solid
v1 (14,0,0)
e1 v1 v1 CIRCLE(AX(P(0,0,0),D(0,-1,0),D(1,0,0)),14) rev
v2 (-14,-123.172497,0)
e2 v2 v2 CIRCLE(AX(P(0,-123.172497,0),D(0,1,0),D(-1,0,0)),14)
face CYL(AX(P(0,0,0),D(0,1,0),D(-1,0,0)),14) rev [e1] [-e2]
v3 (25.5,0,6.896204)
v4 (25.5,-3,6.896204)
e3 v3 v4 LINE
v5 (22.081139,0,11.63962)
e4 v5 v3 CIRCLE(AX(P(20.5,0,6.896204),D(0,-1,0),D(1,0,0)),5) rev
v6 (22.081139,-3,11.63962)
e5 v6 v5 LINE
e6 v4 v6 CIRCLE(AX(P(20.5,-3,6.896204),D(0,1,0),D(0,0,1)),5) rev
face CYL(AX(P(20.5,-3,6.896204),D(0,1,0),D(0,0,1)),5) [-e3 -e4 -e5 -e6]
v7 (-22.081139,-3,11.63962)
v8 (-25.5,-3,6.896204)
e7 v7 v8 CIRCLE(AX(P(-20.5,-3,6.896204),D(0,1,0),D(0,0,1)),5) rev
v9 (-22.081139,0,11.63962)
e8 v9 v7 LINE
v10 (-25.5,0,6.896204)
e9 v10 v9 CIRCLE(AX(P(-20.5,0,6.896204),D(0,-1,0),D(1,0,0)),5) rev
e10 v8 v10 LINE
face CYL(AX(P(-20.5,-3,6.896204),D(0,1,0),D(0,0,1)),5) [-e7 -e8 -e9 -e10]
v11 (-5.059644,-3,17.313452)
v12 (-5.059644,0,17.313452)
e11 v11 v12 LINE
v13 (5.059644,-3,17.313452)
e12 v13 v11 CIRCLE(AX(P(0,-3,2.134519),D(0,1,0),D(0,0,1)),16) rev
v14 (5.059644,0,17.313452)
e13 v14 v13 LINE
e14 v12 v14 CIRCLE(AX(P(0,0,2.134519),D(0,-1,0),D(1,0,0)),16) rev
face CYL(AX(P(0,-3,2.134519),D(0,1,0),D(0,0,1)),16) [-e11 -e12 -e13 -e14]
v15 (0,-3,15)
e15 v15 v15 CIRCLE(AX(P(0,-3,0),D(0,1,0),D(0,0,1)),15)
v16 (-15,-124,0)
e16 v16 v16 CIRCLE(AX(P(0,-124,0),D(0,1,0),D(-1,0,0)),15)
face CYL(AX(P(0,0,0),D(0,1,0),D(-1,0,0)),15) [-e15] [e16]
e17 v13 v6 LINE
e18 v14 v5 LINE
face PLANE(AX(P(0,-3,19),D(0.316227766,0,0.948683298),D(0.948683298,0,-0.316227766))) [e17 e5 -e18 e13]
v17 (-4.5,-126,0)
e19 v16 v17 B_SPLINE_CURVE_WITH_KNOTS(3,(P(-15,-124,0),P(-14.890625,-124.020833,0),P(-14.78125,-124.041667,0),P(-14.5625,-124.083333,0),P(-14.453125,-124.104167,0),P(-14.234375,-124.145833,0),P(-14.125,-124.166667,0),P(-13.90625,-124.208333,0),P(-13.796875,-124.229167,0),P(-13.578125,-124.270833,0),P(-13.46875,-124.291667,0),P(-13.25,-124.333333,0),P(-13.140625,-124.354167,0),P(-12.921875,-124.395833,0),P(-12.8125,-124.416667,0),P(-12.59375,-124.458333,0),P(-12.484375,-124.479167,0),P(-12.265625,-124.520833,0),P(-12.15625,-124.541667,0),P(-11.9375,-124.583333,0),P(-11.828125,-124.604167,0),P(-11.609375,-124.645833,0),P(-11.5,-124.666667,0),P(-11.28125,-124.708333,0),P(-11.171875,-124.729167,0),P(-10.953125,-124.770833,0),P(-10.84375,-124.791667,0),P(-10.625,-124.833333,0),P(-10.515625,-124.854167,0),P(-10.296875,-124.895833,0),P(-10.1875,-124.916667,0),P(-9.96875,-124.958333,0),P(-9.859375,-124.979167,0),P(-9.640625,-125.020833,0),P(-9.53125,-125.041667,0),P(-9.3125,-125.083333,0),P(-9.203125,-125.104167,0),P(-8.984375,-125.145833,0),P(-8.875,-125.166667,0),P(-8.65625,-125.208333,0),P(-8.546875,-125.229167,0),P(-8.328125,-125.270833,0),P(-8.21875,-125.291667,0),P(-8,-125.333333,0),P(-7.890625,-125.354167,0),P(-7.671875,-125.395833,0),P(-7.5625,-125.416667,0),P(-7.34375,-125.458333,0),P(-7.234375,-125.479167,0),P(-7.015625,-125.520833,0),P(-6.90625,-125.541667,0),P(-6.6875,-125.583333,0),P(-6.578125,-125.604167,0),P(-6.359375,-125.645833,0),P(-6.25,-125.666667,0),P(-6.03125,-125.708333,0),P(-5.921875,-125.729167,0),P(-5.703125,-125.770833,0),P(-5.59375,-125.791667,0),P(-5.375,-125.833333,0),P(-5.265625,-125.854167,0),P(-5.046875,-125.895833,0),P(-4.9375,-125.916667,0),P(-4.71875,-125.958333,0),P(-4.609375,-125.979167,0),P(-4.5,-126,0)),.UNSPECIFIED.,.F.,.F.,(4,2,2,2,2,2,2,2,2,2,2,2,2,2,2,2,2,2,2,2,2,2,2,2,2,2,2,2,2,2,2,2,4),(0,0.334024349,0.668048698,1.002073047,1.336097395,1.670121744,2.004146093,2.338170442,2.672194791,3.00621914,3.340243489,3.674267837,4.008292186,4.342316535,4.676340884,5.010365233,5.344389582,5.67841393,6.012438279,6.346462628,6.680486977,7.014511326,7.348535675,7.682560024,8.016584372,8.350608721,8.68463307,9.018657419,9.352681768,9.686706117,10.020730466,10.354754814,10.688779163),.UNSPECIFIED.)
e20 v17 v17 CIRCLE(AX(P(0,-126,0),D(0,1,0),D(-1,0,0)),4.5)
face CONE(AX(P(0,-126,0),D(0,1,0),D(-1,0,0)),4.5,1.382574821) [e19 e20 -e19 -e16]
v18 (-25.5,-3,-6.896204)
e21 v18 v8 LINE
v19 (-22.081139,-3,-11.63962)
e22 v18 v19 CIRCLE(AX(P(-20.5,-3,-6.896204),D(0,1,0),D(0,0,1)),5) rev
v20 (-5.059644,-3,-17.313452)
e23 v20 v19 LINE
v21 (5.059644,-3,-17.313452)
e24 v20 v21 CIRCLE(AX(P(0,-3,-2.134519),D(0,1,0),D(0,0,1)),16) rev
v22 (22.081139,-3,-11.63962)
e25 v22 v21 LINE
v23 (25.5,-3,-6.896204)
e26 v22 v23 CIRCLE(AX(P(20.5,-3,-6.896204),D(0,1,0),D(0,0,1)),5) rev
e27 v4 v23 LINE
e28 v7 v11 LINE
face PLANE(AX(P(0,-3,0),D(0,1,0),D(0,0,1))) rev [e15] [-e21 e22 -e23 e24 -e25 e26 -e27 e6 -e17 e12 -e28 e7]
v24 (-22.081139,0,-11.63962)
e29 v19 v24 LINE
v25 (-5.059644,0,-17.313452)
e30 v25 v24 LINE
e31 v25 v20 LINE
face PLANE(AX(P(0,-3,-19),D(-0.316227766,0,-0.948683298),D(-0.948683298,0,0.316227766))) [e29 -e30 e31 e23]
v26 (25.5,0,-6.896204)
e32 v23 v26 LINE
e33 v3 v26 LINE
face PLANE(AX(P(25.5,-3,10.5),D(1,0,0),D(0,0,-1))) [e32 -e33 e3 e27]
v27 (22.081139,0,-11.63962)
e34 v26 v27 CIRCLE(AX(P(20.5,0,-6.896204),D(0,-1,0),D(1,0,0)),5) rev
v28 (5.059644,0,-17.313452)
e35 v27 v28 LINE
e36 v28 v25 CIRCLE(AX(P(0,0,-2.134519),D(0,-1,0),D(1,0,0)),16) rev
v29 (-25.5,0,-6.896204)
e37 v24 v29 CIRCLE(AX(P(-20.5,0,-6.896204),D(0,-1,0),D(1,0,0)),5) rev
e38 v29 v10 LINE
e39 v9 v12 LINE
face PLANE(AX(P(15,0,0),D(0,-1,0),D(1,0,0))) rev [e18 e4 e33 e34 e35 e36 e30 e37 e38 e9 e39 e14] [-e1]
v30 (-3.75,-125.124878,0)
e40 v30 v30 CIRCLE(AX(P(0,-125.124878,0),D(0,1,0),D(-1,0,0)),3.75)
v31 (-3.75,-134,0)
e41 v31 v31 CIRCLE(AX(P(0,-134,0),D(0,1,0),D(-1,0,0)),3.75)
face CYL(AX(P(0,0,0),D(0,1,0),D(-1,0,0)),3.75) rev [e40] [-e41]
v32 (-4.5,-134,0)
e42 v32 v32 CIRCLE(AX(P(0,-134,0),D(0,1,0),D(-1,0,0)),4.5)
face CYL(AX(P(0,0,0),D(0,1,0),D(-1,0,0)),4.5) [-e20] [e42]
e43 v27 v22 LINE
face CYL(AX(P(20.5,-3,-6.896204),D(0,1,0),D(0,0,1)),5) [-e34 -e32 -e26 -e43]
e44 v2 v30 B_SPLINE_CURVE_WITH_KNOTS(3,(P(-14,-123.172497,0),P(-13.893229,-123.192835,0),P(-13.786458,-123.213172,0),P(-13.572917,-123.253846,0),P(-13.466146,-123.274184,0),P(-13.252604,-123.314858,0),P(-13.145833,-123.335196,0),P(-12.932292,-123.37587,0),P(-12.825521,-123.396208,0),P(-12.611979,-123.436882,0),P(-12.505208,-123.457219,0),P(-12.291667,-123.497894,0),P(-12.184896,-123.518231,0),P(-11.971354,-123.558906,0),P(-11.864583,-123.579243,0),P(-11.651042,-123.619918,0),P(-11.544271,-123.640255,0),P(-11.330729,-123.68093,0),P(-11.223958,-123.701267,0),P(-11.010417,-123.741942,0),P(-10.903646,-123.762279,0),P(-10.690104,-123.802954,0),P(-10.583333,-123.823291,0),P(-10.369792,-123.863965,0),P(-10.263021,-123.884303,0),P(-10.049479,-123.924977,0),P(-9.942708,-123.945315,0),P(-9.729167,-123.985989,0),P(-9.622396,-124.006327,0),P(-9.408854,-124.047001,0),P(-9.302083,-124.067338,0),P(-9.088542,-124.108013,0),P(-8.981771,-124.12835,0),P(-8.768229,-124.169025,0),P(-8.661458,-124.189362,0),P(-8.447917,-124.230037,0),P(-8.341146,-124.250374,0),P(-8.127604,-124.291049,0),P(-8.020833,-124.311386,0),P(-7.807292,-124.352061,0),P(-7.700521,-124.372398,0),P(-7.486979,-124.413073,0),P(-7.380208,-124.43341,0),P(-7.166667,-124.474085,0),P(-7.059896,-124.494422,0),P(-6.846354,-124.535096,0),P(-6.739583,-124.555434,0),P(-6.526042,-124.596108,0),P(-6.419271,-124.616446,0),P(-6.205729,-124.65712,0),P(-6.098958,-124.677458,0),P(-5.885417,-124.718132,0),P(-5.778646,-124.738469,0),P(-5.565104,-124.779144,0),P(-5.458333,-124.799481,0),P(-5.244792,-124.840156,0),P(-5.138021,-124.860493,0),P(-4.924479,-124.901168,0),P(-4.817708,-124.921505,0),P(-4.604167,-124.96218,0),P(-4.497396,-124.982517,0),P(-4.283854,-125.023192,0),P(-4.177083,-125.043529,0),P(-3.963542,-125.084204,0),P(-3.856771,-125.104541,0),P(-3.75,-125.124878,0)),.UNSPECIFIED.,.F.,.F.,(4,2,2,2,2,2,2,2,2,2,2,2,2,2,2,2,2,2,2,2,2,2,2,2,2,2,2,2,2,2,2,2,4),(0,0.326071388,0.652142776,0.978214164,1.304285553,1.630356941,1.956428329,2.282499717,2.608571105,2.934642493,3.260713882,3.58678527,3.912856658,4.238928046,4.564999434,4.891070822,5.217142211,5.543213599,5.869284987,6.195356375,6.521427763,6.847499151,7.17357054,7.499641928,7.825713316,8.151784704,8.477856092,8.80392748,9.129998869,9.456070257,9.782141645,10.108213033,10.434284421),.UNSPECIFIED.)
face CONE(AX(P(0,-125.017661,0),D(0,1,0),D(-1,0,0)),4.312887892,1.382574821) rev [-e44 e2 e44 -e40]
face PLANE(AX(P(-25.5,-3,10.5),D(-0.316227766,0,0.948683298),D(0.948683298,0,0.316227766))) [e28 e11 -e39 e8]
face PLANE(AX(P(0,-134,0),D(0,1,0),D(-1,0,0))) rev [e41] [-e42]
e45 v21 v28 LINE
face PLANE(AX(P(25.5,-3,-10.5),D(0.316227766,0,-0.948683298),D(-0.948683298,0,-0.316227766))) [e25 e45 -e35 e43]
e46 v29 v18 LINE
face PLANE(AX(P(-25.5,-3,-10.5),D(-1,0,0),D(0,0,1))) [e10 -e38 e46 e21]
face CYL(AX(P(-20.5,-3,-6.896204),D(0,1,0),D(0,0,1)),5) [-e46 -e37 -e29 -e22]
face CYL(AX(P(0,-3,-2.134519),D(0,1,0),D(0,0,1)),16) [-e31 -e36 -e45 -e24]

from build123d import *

# Parameters (mm, degrees)
SKIZZE1_R                       = 15
AUFSATZ_LINEAR_AUSTRAGEN1_DEPTH = 3
VERRUNDUNG1_R                   = 16
VERRUNDUNG2_R                   = 5


# Read off the part's stored shape, not the designer's step: Wandung1
with BuildPart() as part:
    # Skizze2 → Rotation1 (revolve)
    with BuildSketch(Plane.XY, mode=Mode.PRIVATE) as rotation1_sk:
        Polygon((0, -134), (4.5, -134), (4.5, -126), (15, -124), (15, 0), (0, 0), align=None)
    revolve(rotation1_sk.sketch.rotate(Axis((0, 0, 0), (0, -1, 0)), 180), axis=Axis((0, 0, 0), (0, -1, 0)))

    # Wandung1 outline → Wandung1 (revolve, cut)
    with BuildSketch(Plane.XY):
        Polygon((0, -134), (3.75, -134), (3.75, -125.124878175), (14, -123.172497223), (14, 0), (0, 0), align=None)
    revolve(axis=Axis((0, 0, 0), (0, 1, 0)), mode=Mode.SUBTRACT)

    # Skizze1 → Aufsatz-Linear austragen1 (add)
    with BuildSketch(Plane(origin=(0, 0, 0), x_dir=(1, 0, 0), z_dir=(0, 1, 0))):
        Polygon((0, -19), (25.5, -10.5), (25.5, 10.5), (0, 19), (-25.5, 10.5), (-25.5, -10.5), align=None)
        with Locations(Location((0, 0, 0), (0, 0, 180))):
            Circle(SKIZZE1_R, mode=Mode.SUBTRACT)
    extrude(amount=-AUFSATZ_LINEAR_AUSTRAGEN1_DEPTH)

    # Verrundung1
    verrundung1_edges = [part.edges().sort_by_distance(p)[0] for p in [
        (0, -1.5, 19),
        (0, -1.5, -19),
    ]]
    fillet(verrundung1_edges, radius=VERRUNDUNG1_R)

    # Verrundung2
    verrundung2_edges = [part.edges().sort_by_distance(p)[0] for p in [
        (-25.5, -1.5, 10.5),
        (-25.5, -1.5, -10.5),
        (25.5, -1.5, -10.5),
        (25.5, -1.5, 10.5),
    ]]
    fillet(verrundung2_edges, radius=VERRUNDUNG2_R)


solid = part.part
